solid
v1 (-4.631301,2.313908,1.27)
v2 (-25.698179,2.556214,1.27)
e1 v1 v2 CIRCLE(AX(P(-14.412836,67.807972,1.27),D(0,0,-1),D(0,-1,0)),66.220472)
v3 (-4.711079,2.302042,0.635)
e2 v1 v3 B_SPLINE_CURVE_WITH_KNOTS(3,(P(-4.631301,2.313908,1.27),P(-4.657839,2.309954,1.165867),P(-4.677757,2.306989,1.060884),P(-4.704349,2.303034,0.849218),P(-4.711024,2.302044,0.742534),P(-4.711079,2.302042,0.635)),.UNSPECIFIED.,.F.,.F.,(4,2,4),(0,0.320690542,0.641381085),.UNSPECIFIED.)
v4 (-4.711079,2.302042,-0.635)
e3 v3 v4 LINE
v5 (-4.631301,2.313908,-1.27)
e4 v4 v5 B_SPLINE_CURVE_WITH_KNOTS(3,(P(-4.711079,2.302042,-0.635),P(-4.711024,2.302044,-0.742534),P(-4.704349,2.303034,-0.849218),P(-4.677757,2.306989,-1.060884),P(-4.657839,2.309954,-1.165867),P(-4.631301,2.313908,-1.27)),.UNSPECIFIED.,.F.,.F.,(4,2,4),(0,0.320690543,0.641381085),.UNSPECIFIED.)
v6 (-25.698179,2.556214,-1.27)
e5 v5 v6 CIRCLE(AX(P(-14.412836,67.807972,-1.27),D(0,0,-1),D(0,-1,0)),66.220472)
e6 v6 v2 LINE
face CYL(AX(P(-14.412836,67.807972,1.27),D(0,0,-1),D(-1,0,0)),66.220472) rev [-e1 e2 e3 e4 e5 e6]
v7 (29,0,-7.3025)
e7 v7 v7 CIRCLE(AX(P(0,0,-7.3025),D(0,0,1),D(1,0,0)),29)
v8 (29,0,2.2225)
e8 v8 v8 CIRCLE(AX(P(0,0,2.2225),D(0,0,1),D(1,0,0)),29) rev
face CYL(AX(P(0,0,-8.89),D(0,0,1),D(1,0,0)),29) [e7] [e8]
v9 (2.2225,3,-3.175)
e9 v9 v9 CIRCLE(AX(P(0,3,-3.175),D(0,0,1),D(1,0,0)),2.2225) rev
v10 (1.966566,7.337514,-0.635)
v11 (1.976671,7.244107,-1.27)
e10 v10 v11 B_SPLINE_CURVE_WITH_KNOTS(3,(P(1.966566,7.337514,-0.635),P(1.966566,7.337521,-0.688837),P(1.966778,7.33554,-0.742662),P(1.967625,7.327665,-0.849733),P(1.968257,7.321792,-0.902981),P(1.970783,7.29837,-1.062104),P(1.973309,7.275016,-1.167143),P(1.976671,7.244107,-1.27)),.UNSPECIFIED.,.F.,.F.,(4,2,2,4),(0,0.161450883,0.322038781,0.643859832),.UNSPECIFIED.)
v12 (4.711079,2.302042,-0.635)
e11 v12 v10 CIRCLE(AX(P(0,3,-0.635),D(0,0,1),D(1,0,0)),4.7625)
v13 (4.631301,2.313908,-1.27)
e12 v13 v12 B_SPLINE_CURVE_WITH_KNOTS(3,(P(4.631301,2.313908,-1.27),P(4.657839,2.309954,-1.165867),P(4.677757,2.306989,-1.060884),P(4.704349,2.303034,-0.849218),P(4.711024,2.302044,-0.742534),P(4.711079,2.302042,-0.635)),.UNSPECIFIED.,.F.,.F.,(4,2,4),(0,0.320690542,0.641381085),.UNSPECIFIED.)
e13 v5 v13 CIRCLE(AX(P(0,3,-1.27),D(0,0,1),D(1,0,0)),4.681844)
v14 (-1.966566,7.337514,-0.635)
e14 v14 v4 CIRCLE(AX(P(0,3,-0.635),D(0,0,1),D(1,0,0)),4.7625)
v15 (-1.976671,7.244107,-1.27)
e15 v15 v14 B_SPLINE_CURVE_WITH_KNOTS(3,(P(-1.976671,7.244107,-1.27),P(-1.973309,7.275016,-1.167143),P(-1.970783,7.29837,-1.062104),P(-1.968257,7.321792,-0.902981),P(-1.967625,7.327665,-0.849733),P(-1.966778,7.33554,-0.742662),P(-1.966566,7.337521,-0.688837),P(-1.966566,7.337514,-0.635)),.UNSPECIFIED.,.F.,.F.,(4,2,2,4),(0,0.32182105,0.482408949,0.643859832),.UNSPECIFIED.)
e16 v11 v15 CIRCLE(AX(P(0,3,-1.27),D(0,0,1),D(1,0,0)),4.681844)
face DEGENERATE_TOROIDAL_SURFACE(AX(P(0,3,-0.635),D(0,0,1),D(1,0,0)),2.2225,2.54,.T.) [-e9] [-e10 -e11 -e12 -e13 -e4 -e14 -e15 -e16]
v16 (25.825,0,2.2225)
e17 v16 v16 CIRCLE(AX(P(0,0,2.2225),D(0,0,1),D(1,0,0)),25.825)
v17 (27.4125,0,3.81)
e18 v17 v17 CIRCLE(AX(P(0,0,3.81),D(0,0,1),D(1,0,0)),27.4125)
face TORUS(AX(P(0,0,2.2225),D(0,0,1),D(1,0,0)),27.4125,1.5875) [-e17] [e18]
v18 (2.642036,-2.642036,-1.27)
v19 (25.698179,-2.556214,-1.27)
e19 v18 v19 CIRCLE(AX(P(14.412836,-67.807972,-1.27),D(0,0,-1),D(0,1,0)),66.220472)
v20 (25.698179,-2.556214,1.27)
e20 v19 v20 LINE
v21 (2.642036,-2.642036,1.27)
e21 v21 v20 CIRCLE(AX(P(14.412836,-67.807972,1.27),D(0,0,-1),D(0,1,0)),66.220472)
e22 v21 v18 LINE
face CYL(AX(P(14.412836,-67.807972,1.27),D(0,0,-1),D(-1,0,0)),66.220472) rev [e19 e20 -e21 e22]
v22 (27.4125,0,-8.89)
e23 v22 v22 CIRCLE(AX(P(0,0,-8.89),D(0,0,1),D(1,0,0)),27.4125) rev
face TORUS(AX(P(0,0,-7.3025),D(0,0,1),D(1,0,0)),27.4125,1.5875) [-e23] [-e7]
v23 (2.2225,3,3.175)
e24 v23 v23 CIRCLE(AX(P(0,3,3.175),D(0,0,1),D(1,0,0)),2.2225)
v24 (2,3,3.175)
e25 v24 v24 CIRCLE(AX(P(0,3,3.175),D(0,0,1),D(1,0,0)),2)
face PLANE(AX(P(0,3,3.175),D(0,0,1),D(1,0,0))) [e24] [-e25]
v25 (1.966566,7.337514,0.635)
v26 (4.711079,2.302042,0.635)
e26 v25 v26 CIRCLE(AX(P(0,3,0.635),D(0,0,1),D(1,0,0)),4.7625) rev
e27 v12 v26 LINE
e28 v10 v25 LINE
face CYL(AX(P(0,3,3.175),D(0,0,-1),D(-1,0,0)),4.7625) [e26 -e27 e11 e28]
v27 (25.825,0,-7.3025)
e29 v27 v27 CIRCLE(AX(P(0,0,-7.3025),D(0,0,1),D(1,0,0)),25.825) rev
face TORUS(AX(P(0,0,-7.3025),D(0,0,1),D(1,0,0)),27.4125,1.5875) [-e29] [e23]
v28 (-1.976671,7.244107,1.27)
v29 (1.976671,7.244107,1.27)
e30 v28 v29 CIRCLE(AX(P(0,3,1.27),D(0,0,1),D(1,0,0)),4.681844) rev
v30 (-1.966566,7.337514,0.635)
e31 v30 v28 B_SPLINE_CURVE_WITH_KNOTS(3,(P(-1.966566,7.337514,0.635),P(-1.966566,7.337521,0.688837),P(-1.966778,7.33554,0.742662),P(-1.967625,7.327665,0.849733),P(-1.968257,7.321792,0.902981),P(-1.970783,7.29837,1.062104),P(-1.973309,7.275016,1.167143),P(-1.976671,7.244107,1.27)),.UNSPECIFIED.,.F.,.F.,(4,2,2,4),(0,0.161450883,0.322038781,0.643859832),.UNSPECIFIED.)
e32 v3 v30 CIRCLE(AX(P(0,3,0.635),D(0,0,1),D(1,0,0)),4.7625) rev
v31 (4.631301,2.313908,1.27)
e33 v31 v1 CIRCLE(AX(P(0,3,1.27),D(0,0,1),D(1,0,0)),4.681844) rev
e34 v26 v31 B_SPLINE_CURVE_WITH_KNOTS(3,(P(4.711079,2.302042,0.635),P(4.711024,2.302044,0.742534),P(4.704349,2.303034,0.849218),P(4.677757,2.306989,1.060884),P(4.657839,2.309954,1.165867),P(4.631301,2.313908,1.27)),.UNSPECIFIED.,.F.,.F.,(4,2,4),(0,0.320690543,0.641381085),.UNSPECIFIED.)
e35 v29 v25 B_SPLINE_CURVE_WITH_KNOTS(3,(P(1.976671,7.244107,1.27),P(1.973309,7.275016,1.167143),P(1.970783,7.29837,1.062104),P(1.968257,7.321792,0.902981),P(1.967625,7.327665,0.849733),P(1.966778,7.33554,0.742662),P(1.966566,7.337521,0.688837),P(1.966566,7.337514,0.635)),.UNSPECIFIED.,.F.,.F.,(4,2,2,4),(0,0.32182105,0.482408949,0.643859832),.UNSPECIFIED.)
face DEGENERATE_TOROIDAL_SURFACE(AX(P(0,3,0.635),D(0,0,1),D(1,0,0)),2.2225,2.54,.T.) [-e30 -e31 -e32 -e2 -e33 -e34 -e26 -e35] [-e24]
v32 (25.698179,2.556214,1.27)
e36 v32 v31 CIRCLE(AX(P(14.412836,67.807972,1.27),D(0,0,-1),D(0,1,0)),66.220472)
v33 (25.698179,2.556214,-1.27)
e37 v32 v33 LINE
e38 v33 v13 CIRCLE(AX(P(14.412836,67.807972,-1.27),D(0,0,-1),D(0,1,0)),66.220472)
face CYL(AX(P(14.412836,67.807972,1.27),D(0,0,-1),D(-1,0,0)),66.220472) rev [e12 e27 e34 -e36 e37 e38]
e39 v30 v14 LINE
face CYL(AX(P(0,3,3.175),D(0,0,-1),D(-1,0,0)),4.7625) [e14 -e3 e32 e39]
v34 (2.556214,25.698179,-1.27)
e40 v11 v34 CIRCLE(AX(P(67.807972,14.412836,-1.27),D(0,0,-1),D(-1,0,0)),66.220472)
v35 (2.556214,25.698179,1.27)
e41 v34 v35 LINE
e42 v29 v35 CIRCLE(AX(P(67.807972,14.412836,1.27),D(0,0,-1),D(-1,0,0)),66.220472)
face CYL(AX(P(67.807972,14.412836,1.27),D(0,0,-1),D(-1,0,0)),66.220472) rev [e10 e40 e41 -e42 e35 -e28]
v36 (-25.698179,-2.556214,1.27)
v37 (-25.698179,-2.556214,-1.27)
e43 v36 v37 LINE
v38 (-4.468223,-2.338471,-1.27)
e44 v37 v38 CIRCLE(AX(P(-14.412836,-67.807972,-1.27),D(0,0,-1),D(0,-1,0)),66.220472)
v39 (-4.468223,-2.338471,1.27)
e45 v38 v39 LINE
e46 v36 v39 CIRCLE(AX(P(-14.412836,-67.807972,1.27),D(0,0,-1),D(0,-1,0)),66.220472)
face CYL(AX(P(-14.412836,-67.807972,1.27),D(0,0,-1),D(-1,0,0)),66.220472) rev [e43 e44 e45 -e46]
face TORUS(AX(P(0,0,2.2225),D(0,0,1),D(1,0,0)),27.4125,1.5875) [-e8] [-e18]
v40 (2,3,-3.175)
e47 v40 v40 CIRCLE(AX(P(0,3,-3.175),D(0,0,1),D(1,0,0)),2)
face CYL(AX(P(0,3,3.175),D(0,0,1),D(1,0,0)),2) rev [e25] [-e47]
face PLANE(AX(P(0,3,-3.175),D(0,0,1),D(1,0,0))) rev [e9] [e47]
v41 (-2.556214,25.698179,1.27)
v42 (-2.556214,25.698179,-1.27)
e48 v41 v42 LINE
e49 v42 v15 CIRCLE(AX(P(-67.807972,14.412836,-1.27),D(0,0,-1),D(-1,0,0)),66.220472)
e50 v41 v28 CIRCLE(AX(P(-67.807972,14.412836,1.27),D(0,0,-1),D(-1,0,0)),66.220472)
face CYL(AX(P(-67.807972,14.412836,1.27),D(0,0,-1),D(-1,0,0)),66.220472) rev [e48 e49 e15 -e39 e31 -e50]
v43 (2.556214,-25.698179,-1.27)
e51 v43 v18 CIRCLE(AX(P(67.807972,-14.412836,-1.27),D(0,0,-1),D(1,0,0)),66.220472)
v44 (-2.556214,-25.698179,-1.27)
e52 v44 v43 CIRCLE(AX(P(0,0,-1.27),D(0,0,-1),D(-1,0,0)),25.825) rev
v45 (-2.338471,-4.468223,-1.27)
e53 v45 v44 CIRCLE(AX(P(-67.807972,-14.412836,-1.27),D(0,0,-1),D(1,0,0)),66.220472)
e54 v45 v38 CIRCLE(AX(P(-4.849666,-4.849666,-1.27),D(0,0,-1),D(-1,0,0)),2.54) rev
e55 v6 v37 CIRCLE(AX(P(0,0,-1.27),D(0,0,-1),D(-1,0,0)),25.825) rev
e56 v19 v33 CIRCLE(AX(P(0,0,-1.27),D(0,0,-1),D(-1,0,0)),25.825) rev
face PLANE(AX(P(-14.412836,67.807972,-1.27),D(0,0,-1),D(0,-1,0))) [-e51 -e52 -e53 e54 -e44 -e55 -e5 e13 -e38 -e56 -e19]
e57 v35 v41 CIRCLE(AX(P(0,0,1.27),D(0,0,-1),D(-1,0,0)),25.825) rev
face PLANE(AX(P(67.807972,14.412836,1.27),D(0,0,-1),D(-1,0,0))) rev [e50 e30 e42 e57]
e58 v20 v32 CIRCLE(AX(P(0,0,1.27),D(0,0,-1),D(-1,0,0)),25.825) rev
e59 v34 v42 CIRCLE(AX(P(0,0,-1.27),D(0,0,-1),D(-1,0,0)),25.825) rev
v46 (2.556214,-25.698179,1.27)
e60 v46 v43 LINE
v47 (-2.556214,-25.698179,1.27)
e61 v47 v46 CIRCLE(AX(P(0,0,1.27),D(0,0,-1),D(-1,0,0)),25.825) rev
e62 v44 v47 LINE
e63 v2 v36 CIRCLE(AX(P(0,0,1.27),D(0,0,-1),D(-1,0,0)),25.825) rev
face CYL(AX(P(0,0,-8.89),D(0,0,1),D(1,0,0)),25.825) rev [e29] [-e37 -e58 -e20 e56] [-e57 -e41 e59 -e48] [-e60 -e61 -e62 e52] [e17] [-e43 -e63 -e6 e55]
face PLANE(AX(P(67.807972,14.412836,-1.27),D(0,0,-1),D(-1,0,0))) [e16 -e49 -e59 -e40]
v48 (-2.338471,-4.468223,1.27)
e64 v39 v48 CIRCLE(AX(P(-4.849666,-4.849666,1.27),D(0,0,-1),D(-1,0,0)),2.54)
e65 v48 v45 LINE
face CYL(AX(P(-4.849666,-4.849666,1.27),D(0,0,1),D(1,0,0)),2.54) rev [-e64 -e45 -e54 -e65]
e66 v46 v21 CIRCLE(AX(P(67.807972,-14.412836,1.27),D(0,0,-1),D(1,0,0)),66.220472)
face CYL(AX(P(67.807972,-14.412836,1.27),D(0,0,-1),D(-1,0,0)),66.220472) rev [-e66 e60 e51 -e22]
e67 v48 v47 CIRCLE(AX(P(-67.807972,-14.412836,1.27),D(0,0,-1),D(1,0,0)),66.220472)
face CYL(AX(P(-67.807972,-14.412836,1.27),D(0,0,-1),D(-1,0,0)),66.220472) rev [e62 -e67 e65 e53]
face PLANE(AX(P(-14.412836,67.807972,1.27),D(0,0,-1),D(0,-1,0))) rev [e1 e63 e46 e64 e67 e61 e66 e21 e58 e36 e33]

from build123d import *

# Parameters (mm, degrees)
BOSS_EXTRUDE2_DEPTH      = 3.81
BOSS_EXTRUDE2_DEPTH_BACK = 8.89
SKETCH1_R                = 28.999999992
SKETCH1_R_2              = 25.824999992
SKETCH8_R                = 4.7625
BOSS_EXTRUDE3_DEPTH      = 3.175
BOSS_EXTRUDE4_DEPTH      = 1.27
CIRPATTERN1_COUNT        = 4
F_3_0MM_DOWEL_HOLE2_D    = 4
FILLET1_R                = 1.5875
FILLET2_R                = 2.54


# Some blends are built 0.0001 mm under size
with BuildPart() as part:
    # Sketch1 → Boss-Extrude2 (new, two sides: drawn at the far end of the back side and taken through both)
    with BuildSketch(Plane.XY.offset(-BOSS_EXTRUDE2_DEPTH_BACK)):
        Circle(SKETCH1_R)
        Circle(SKETCH1_R_2, mode=Mode.SUBTRACT)
    extrude(amount=BOSS_EXTRUDE2_DEPTH + BOSS_EXTRUDE2_DEPTH_BACK)



with BuildPart() as body_2:
    # Sketch8 → Boss-Extrude3 (new, symmetric)
    with BuildSketch(Plane.XY):
        with Locations((0, 3)):
            Circle(SKETCH8_R)
    extrude(amount=BOSS_EXTRUDE3_DEPTH, both=True)


with BuildPart() as part_1:
    add(part.part)

    add(body_2.part)  # Boss-Extrude4 merges body 2
    # Sketch9 → Boss-Extrude4 (add, symmetric)
    with BuildSketch(Plane.XY):
        with BuildLine():
            Line((3.175, 0), (-3.175, 0))
            ThreePointArc((-3.175, 0), (-1.5875, 14.412836072), (-3.175, 28.825672144))
            Line((-3.175, 28.825672144), (3.175, 28.825672144))
            ThreePointArc((3.175, 28.825672144), (1.5875, 14.412836072), (3.175, 0))
        make_face()
    boss_extrude4 = extrude(amount=BOSS_EXTRUDE4_DEPTH, both=True)

    # CirPattern1: Boss-Extrude4 ×4 about axis
    cirpattern1_axis = Axis((0, 0, 0), (0, 0, 1))
    for i in range(1, CIRPATTERN1_COUNT):
        add(boss_extrude4.rotate(cirpattern1_axis, i * 360 / CIRPATTERN1_COUNT))

    # Ø3.0mm Dowel Hole2 (through all)
    with Locations(Plane.XY.offset(3.175)):
        with Locations((0, 3)):
            Hole(F_3_0MM_DOWEL_HOLE2_D / 2)

    # Fillet1
    fillet1_edges = [part_1.edges().sort_by_distance(p)[0] for p in [
        (-28.999999992, 0, -8.89),
        (-25.824999992, 0, -8.89),
        (-28.999999992, 0, 3.81),
        (-25.824999992, 0, 3.81),
    ]]
    fillet(fillet1_edges, radius=FILLET1_R - 0.0001)  # a hair under: the kernel refuses the full size

    # Fillet2
    # the kernel refuses this fillet: 2.54 mm, written as the material it adds along each edge
    with BuildSketch(Plane(origin=(-2.642036236, -2.642036236, -1.27), x_dir=(-0.9864638290432723, 0.16397900472098711, 0), z_dir=(0, 0, 1))) as fillet2_piece_1:
        with BuildLine():
            CenterArc((1.815741987, 2.539751853), FILLET2_R, 198.074955273, 72.725945295)
            ThreePointArc((-0.598912674, 1.751689123), (-0.305577869, 0.873751575), (0, 0))
            ThreePointArc((0, 0), (0.925622922, -0.006469447), (1.851245845, 0))
        make_face()
    extrude(amount=2.54)
    # the kernel refuses this fillet: 2.54 mm, written as the material it takes off along each edge
    with BuildSketch(Plane(origin=(0, 3, -3.175), x_dir=(1, 0, 0), z_dir=(0, -1, 0))) as fillet2_2_piece_1_section:
        with BuildLine():
            CenterArc((4.7625 - FILLET2_R, FILLET2_R), FILLET2_R, 270, 90)
            Line((4.7625 - FILLET2_R, 0), (4.7625, 0))
            Line((4.7625, 0), (4.7625, FILLET2_R))
        make_face()
    fillet2_2_piece_1 = revolve(axis=Axis((0, 3, -3.175), (0, 0, 1)), mode=Mode.PRIVATE)
    fillet2_2_piece_1 = fillet2_2_piece_1 & Plane(origin=(14.412836072, 67.807972404, -0.955463764), x_dir=(-0.21764924876751077, -0.9760270511163809, 0), z_dir=(0, 0, 1)) * Cylinder(66.220472404, 20, mode=Mode.PRIVATE)
    fillet2_2_piece_1 = fillet2_2_piece_1 - Plane(origin=(-14.412836072, 67.807972404, -0.955463764), x_dir=(-0.21764924876750993, -0.9760270511163811, 0), z_dir=(0, 0, 1)) * Cylinder(66.220472404, 20, mode=Mode.PRIVATE)
    add(fillet2_2_piece_1, mode=Mode.SUBTRACT)
    with BuildSketch(Plane(origin=(0, 3, -3.175), x_dir=(1, 0, 0), z_dir=(0, -1, 0))) as fillet2_2_piece_2_section:
        with BuildLine():
            CenterArc((4.7625 - FILLET2_R, FILLET2_R), FILLET2_R, 270, 90)
            Line((4.7625 - FILLET2_R, 0), (4.7625, 0))
            Line((4.7625, 0), (4.7625, FILLET2_R))
        make_face()
    fillet2_2_piece_2 = revolve(axis=Axis((0, 3, -3.175), (0, 0, 1)), mode=Mode.PRIVATE)
    fillet2_2_piece_2 = fillet2_2_piece_2 & Plane(origin=(67.807972404, 14.412836072, -0.955566324), x_dir=(-0.9760270511163811, 0.21764924876750982, 0), z_dir=(0, 0, 1)) * Cylinder(66.220472404, 20, mode=Mode.PRIVATE)
    fillet2_2_piece_2 = fillet2_2_piece_2 & Plane(origin=(-14.412836072, 67.807972404, -0.955566324), x_dir=(-0.21764924876750993, -0.9760270511163811, 0), z_dir=(0, 0, 1)) * Cylinder(66.220472404, 20, mode=Mode.PRIVATE)
    add(fillet2_2_piece_2, mode=Mode.SUBTRACT)
    with BuildSketch(Plane(origin=(0, 3, -3.175), x_dir=(1, 0, 0), z_dir=(0, -1, 0))) as fillet2_2_piece_3_section:
        with BuildLine():
            CenterArc((4.7625 - FILLET2_R, FILLET2_R), FILLET2_R, 270, 90)
            Line((4.7625 - FILLET2_R, 0), (4.7625, 0))
            Line((4.7625, 0), (4.7625, FILLET2_R))
        make_face()
    fillet2_2_piece_3 = revolve(axis=Axis((0, 3, -3.175), (0, 0, 1)), mode=Mode.PRIVATE)
    fillet2_2_piece_3 = split(fillet2_2_piece_3, bisect_by=Plane(origin=(3.831400091, 1.166208348, -1.27), z_dir=(0, 0, -1)), keep=Keep.TOP, mode=Mode.PRIVATE)
    add(fillet2_2_piece_3, mode=Mode.SUBTRACT)
    with BuildSketch(Plane(origin=(0, 3, -3.175), x_dir=(1, 0, 0), z_dir=(0, -1, 0))) as fillet2_2_piece_4_section:
        with BuildLine():
            CenterArc((4.7625 - FILLET2_R, FILLET2_R), FILLET2_R, 270, 90)
            Line((4.7625 - FILLET2_R, 0), (4.7625, 0))
            Line((4.7625, 0), (4.7625, FILLET2_R))
        make_face()
    fillet2_2_piece_4 = revolve(axis=Axis((0, 3, -3.175), (0, 0, 1)), mode=Mode.PRIVATE)
    fillet2_2_piece_4 = fillet2_2_piece_4 & Plane(origin=(-67.807972404, 14.412836072, -0.955566324), x_dir=(0.9760270511163809, -0.21764924876751054, 0), z_dir=(0, 0, 1)) * Cylinder(66.220472404, 20, mode=Mode.PRIVATE)
    fillet2_2_piece_4 = fillet2_2_piece_4 & Plane(origin=(-14.412836072, 67.807972404, -0.955566324), x_dir=(-0.21764924876750993, -0.9760270511163811, 0), z_dir=(0, 0, 1)) * Cylinder(66.220472404, 20, mode=Mode.PRIVATE)
    add(fillet2_2_piece_4, mode=Mode.SUBTRACT)
    with BuildSketch(Plane(origin=(0, 3, 3.175), x_dir=(1, 0, 0), z_dir=(0, -1, 0))) as fillet2_2_piece_5_section:
        with BuildLine():
            CenterArc((4.7625 - FILLET2_R, -FILLET2_R), FILLET2_R, 0, 90)
            Line((4.7625 - FILLET2_R, 0), (4.7625, 0))
            Line((4.7625, 0), (4.7625, -FILLET2_R))
        make_face()
    fillet2_2_piece_5 = revolve(axis=Axis((0, 3, 3.175), (0, 0, 1)), mode=Mode.PRIVATE)
    fillet2_2_piece_5 = fillet2_2_piece_5 & Plane(origin=(14.412836072, 67.807972404, 0.955463764), x_dir=(-0.21764924876751077, -0.9760270511163809, 0), z_dir=(0, 0, 1)) * Cylinder(66.220472404, 20, mode=Mode.PRIVATE)
    fillet2_2_piece_5 = fillet2_2_piece_5 - Plane(origin=(-14.412836072, 67.807972404, 0.955463764), x_dir=(-0.21764924876750993, -0.9760270511163811, 0), z_dir=(0, 0, 1)) * Cylinder(66.220472404, 20, mode=Mode.PRIVATE)
    add(fillet2_2_piece_5, mode=Mode.SUBTRACT)
    with BuildSketch(Plane(origin=(0, 3, 3.175), x_dir=(1, 0, 0), z_dir=(0, -1, 0))) as fillet2_2_piece_6_section:
        with BuildLine():
            CenterArc((4.7625 - FILLET2_R, -FILLET2_R), FILLET2_R, 0, 90)
            Line((4.7625 - FILLET2_R, 0), (4.7625, 0))
            Line((4.7625, 0), (4.7625, -FILLET2_R))
        make_face()
    fillet2_2_piece_6 = revolve(axis=Axis((0, 3, 3.175), (0, 0, 1)), mode=Mode.PRIVATE)
    fillet2_2_piece_6 = fillet2_2_piece_6 & Plane(origin=(67.807972404, 14.412836072, 0.955566324), x_dir=(-0.9760270511163811, 0.21764924876750982, 0), z_dir=(0, 0, 1)) * Cylinder(66.220472404, 20, mode=Mode.PRIVATE)
    fillet2_2_piece_6 = fillet2_2_piece_6 & Plane(origin=(-14.412836072, 67.807972404, 0.955566324), x_dir=(-0.21764924876750993, -0.9760270511163811, 0), z_dir=(0, 0, 1)) * Cylinder(66.220472404, 20, mode=Mode.PRIVATE)
    add(fillet2_2_piece_6, mode=Mode.SUBTRACT)
    with BuildSketch(Plane(origin=(0, 3, 3.175), x_dir=(1, 0, 0), z_dir=(0, -1, 0))) as fillet2_2_piece_7_section:
        with BuildLine():
            CenterArc((4.7625 - FILLET2_R, -FILLET2_R), FILLET2_R, 0, 90)
            Line((4.7625 - FILLET2_R, 0), (4.7625, 0))
            Line((4.7625, 0), (4.7625, -FILLET2_R))
        make_face()
    fillet2_2_piece_7 = revolve(axis=Axis((0, 3, 3.175), (0, 0, 1)), mode=Mode.PRIVATE)
    fillet2_2_piece_7 = split(fillet2_2_piece_7, bisect_by=Plane(origin=(3.831400091, 1.166208348, 1.27), z_dir=(0, 0, 1)), keep=Keep.TOP, mode=Mode.PRIVATE)
    add(fillet2_2_piece_7, mode=Mode.SUBTRACT)
    with BuildSketch(Plane(origin=(0, 3, 3.175), x_dir=(1, 0, 0), z_dir=(0, -1, 0))) as fillet2_2_piece_8_section:
        with BuildLine():
            CenterArc((4.7625 - FILLET2_R, -FILLET2_R), FILLET2_R, 0, 90)
            Line((4.7625 - FILLET2_R, 0), (4.7625, 0))
            Line((4.7625, 0), (4.7625, -FILLET2_R))
        make_face()
    fillet2_2_piece_8 = revolve(axis=Axis((0, 3, 3.175), (0, 0, 1)), mode=Mode.PRIVATE)
    fillet2_2_piece_8 = fillet2_2_piece_8 & Plane(origin=(-67.807972404, 14.412836072, 0.955566324), x_dir=(0.9760270511163809, -0.21764924876751054, 0), z_dir=(0, 0, 1)) * Cylinder(66.220472404, 20, mode=Mode.PRIVATE)
    fillet2_2_piece_8 = fillet2_2_piece_8 & Plane(origin=(-14.412836072, 67.807972404, 0.955566324), x_dir=(-0.21764924876750993, -0.9760270511163811, 0), z_dir=(0, 0, 1)) * Cylinder(66.220472404, 20, mode=Mode.PRIVATE)
    add(fillet2_2_piece_8, mode=Mode.SUBTRACT)


solid = part_1.part
